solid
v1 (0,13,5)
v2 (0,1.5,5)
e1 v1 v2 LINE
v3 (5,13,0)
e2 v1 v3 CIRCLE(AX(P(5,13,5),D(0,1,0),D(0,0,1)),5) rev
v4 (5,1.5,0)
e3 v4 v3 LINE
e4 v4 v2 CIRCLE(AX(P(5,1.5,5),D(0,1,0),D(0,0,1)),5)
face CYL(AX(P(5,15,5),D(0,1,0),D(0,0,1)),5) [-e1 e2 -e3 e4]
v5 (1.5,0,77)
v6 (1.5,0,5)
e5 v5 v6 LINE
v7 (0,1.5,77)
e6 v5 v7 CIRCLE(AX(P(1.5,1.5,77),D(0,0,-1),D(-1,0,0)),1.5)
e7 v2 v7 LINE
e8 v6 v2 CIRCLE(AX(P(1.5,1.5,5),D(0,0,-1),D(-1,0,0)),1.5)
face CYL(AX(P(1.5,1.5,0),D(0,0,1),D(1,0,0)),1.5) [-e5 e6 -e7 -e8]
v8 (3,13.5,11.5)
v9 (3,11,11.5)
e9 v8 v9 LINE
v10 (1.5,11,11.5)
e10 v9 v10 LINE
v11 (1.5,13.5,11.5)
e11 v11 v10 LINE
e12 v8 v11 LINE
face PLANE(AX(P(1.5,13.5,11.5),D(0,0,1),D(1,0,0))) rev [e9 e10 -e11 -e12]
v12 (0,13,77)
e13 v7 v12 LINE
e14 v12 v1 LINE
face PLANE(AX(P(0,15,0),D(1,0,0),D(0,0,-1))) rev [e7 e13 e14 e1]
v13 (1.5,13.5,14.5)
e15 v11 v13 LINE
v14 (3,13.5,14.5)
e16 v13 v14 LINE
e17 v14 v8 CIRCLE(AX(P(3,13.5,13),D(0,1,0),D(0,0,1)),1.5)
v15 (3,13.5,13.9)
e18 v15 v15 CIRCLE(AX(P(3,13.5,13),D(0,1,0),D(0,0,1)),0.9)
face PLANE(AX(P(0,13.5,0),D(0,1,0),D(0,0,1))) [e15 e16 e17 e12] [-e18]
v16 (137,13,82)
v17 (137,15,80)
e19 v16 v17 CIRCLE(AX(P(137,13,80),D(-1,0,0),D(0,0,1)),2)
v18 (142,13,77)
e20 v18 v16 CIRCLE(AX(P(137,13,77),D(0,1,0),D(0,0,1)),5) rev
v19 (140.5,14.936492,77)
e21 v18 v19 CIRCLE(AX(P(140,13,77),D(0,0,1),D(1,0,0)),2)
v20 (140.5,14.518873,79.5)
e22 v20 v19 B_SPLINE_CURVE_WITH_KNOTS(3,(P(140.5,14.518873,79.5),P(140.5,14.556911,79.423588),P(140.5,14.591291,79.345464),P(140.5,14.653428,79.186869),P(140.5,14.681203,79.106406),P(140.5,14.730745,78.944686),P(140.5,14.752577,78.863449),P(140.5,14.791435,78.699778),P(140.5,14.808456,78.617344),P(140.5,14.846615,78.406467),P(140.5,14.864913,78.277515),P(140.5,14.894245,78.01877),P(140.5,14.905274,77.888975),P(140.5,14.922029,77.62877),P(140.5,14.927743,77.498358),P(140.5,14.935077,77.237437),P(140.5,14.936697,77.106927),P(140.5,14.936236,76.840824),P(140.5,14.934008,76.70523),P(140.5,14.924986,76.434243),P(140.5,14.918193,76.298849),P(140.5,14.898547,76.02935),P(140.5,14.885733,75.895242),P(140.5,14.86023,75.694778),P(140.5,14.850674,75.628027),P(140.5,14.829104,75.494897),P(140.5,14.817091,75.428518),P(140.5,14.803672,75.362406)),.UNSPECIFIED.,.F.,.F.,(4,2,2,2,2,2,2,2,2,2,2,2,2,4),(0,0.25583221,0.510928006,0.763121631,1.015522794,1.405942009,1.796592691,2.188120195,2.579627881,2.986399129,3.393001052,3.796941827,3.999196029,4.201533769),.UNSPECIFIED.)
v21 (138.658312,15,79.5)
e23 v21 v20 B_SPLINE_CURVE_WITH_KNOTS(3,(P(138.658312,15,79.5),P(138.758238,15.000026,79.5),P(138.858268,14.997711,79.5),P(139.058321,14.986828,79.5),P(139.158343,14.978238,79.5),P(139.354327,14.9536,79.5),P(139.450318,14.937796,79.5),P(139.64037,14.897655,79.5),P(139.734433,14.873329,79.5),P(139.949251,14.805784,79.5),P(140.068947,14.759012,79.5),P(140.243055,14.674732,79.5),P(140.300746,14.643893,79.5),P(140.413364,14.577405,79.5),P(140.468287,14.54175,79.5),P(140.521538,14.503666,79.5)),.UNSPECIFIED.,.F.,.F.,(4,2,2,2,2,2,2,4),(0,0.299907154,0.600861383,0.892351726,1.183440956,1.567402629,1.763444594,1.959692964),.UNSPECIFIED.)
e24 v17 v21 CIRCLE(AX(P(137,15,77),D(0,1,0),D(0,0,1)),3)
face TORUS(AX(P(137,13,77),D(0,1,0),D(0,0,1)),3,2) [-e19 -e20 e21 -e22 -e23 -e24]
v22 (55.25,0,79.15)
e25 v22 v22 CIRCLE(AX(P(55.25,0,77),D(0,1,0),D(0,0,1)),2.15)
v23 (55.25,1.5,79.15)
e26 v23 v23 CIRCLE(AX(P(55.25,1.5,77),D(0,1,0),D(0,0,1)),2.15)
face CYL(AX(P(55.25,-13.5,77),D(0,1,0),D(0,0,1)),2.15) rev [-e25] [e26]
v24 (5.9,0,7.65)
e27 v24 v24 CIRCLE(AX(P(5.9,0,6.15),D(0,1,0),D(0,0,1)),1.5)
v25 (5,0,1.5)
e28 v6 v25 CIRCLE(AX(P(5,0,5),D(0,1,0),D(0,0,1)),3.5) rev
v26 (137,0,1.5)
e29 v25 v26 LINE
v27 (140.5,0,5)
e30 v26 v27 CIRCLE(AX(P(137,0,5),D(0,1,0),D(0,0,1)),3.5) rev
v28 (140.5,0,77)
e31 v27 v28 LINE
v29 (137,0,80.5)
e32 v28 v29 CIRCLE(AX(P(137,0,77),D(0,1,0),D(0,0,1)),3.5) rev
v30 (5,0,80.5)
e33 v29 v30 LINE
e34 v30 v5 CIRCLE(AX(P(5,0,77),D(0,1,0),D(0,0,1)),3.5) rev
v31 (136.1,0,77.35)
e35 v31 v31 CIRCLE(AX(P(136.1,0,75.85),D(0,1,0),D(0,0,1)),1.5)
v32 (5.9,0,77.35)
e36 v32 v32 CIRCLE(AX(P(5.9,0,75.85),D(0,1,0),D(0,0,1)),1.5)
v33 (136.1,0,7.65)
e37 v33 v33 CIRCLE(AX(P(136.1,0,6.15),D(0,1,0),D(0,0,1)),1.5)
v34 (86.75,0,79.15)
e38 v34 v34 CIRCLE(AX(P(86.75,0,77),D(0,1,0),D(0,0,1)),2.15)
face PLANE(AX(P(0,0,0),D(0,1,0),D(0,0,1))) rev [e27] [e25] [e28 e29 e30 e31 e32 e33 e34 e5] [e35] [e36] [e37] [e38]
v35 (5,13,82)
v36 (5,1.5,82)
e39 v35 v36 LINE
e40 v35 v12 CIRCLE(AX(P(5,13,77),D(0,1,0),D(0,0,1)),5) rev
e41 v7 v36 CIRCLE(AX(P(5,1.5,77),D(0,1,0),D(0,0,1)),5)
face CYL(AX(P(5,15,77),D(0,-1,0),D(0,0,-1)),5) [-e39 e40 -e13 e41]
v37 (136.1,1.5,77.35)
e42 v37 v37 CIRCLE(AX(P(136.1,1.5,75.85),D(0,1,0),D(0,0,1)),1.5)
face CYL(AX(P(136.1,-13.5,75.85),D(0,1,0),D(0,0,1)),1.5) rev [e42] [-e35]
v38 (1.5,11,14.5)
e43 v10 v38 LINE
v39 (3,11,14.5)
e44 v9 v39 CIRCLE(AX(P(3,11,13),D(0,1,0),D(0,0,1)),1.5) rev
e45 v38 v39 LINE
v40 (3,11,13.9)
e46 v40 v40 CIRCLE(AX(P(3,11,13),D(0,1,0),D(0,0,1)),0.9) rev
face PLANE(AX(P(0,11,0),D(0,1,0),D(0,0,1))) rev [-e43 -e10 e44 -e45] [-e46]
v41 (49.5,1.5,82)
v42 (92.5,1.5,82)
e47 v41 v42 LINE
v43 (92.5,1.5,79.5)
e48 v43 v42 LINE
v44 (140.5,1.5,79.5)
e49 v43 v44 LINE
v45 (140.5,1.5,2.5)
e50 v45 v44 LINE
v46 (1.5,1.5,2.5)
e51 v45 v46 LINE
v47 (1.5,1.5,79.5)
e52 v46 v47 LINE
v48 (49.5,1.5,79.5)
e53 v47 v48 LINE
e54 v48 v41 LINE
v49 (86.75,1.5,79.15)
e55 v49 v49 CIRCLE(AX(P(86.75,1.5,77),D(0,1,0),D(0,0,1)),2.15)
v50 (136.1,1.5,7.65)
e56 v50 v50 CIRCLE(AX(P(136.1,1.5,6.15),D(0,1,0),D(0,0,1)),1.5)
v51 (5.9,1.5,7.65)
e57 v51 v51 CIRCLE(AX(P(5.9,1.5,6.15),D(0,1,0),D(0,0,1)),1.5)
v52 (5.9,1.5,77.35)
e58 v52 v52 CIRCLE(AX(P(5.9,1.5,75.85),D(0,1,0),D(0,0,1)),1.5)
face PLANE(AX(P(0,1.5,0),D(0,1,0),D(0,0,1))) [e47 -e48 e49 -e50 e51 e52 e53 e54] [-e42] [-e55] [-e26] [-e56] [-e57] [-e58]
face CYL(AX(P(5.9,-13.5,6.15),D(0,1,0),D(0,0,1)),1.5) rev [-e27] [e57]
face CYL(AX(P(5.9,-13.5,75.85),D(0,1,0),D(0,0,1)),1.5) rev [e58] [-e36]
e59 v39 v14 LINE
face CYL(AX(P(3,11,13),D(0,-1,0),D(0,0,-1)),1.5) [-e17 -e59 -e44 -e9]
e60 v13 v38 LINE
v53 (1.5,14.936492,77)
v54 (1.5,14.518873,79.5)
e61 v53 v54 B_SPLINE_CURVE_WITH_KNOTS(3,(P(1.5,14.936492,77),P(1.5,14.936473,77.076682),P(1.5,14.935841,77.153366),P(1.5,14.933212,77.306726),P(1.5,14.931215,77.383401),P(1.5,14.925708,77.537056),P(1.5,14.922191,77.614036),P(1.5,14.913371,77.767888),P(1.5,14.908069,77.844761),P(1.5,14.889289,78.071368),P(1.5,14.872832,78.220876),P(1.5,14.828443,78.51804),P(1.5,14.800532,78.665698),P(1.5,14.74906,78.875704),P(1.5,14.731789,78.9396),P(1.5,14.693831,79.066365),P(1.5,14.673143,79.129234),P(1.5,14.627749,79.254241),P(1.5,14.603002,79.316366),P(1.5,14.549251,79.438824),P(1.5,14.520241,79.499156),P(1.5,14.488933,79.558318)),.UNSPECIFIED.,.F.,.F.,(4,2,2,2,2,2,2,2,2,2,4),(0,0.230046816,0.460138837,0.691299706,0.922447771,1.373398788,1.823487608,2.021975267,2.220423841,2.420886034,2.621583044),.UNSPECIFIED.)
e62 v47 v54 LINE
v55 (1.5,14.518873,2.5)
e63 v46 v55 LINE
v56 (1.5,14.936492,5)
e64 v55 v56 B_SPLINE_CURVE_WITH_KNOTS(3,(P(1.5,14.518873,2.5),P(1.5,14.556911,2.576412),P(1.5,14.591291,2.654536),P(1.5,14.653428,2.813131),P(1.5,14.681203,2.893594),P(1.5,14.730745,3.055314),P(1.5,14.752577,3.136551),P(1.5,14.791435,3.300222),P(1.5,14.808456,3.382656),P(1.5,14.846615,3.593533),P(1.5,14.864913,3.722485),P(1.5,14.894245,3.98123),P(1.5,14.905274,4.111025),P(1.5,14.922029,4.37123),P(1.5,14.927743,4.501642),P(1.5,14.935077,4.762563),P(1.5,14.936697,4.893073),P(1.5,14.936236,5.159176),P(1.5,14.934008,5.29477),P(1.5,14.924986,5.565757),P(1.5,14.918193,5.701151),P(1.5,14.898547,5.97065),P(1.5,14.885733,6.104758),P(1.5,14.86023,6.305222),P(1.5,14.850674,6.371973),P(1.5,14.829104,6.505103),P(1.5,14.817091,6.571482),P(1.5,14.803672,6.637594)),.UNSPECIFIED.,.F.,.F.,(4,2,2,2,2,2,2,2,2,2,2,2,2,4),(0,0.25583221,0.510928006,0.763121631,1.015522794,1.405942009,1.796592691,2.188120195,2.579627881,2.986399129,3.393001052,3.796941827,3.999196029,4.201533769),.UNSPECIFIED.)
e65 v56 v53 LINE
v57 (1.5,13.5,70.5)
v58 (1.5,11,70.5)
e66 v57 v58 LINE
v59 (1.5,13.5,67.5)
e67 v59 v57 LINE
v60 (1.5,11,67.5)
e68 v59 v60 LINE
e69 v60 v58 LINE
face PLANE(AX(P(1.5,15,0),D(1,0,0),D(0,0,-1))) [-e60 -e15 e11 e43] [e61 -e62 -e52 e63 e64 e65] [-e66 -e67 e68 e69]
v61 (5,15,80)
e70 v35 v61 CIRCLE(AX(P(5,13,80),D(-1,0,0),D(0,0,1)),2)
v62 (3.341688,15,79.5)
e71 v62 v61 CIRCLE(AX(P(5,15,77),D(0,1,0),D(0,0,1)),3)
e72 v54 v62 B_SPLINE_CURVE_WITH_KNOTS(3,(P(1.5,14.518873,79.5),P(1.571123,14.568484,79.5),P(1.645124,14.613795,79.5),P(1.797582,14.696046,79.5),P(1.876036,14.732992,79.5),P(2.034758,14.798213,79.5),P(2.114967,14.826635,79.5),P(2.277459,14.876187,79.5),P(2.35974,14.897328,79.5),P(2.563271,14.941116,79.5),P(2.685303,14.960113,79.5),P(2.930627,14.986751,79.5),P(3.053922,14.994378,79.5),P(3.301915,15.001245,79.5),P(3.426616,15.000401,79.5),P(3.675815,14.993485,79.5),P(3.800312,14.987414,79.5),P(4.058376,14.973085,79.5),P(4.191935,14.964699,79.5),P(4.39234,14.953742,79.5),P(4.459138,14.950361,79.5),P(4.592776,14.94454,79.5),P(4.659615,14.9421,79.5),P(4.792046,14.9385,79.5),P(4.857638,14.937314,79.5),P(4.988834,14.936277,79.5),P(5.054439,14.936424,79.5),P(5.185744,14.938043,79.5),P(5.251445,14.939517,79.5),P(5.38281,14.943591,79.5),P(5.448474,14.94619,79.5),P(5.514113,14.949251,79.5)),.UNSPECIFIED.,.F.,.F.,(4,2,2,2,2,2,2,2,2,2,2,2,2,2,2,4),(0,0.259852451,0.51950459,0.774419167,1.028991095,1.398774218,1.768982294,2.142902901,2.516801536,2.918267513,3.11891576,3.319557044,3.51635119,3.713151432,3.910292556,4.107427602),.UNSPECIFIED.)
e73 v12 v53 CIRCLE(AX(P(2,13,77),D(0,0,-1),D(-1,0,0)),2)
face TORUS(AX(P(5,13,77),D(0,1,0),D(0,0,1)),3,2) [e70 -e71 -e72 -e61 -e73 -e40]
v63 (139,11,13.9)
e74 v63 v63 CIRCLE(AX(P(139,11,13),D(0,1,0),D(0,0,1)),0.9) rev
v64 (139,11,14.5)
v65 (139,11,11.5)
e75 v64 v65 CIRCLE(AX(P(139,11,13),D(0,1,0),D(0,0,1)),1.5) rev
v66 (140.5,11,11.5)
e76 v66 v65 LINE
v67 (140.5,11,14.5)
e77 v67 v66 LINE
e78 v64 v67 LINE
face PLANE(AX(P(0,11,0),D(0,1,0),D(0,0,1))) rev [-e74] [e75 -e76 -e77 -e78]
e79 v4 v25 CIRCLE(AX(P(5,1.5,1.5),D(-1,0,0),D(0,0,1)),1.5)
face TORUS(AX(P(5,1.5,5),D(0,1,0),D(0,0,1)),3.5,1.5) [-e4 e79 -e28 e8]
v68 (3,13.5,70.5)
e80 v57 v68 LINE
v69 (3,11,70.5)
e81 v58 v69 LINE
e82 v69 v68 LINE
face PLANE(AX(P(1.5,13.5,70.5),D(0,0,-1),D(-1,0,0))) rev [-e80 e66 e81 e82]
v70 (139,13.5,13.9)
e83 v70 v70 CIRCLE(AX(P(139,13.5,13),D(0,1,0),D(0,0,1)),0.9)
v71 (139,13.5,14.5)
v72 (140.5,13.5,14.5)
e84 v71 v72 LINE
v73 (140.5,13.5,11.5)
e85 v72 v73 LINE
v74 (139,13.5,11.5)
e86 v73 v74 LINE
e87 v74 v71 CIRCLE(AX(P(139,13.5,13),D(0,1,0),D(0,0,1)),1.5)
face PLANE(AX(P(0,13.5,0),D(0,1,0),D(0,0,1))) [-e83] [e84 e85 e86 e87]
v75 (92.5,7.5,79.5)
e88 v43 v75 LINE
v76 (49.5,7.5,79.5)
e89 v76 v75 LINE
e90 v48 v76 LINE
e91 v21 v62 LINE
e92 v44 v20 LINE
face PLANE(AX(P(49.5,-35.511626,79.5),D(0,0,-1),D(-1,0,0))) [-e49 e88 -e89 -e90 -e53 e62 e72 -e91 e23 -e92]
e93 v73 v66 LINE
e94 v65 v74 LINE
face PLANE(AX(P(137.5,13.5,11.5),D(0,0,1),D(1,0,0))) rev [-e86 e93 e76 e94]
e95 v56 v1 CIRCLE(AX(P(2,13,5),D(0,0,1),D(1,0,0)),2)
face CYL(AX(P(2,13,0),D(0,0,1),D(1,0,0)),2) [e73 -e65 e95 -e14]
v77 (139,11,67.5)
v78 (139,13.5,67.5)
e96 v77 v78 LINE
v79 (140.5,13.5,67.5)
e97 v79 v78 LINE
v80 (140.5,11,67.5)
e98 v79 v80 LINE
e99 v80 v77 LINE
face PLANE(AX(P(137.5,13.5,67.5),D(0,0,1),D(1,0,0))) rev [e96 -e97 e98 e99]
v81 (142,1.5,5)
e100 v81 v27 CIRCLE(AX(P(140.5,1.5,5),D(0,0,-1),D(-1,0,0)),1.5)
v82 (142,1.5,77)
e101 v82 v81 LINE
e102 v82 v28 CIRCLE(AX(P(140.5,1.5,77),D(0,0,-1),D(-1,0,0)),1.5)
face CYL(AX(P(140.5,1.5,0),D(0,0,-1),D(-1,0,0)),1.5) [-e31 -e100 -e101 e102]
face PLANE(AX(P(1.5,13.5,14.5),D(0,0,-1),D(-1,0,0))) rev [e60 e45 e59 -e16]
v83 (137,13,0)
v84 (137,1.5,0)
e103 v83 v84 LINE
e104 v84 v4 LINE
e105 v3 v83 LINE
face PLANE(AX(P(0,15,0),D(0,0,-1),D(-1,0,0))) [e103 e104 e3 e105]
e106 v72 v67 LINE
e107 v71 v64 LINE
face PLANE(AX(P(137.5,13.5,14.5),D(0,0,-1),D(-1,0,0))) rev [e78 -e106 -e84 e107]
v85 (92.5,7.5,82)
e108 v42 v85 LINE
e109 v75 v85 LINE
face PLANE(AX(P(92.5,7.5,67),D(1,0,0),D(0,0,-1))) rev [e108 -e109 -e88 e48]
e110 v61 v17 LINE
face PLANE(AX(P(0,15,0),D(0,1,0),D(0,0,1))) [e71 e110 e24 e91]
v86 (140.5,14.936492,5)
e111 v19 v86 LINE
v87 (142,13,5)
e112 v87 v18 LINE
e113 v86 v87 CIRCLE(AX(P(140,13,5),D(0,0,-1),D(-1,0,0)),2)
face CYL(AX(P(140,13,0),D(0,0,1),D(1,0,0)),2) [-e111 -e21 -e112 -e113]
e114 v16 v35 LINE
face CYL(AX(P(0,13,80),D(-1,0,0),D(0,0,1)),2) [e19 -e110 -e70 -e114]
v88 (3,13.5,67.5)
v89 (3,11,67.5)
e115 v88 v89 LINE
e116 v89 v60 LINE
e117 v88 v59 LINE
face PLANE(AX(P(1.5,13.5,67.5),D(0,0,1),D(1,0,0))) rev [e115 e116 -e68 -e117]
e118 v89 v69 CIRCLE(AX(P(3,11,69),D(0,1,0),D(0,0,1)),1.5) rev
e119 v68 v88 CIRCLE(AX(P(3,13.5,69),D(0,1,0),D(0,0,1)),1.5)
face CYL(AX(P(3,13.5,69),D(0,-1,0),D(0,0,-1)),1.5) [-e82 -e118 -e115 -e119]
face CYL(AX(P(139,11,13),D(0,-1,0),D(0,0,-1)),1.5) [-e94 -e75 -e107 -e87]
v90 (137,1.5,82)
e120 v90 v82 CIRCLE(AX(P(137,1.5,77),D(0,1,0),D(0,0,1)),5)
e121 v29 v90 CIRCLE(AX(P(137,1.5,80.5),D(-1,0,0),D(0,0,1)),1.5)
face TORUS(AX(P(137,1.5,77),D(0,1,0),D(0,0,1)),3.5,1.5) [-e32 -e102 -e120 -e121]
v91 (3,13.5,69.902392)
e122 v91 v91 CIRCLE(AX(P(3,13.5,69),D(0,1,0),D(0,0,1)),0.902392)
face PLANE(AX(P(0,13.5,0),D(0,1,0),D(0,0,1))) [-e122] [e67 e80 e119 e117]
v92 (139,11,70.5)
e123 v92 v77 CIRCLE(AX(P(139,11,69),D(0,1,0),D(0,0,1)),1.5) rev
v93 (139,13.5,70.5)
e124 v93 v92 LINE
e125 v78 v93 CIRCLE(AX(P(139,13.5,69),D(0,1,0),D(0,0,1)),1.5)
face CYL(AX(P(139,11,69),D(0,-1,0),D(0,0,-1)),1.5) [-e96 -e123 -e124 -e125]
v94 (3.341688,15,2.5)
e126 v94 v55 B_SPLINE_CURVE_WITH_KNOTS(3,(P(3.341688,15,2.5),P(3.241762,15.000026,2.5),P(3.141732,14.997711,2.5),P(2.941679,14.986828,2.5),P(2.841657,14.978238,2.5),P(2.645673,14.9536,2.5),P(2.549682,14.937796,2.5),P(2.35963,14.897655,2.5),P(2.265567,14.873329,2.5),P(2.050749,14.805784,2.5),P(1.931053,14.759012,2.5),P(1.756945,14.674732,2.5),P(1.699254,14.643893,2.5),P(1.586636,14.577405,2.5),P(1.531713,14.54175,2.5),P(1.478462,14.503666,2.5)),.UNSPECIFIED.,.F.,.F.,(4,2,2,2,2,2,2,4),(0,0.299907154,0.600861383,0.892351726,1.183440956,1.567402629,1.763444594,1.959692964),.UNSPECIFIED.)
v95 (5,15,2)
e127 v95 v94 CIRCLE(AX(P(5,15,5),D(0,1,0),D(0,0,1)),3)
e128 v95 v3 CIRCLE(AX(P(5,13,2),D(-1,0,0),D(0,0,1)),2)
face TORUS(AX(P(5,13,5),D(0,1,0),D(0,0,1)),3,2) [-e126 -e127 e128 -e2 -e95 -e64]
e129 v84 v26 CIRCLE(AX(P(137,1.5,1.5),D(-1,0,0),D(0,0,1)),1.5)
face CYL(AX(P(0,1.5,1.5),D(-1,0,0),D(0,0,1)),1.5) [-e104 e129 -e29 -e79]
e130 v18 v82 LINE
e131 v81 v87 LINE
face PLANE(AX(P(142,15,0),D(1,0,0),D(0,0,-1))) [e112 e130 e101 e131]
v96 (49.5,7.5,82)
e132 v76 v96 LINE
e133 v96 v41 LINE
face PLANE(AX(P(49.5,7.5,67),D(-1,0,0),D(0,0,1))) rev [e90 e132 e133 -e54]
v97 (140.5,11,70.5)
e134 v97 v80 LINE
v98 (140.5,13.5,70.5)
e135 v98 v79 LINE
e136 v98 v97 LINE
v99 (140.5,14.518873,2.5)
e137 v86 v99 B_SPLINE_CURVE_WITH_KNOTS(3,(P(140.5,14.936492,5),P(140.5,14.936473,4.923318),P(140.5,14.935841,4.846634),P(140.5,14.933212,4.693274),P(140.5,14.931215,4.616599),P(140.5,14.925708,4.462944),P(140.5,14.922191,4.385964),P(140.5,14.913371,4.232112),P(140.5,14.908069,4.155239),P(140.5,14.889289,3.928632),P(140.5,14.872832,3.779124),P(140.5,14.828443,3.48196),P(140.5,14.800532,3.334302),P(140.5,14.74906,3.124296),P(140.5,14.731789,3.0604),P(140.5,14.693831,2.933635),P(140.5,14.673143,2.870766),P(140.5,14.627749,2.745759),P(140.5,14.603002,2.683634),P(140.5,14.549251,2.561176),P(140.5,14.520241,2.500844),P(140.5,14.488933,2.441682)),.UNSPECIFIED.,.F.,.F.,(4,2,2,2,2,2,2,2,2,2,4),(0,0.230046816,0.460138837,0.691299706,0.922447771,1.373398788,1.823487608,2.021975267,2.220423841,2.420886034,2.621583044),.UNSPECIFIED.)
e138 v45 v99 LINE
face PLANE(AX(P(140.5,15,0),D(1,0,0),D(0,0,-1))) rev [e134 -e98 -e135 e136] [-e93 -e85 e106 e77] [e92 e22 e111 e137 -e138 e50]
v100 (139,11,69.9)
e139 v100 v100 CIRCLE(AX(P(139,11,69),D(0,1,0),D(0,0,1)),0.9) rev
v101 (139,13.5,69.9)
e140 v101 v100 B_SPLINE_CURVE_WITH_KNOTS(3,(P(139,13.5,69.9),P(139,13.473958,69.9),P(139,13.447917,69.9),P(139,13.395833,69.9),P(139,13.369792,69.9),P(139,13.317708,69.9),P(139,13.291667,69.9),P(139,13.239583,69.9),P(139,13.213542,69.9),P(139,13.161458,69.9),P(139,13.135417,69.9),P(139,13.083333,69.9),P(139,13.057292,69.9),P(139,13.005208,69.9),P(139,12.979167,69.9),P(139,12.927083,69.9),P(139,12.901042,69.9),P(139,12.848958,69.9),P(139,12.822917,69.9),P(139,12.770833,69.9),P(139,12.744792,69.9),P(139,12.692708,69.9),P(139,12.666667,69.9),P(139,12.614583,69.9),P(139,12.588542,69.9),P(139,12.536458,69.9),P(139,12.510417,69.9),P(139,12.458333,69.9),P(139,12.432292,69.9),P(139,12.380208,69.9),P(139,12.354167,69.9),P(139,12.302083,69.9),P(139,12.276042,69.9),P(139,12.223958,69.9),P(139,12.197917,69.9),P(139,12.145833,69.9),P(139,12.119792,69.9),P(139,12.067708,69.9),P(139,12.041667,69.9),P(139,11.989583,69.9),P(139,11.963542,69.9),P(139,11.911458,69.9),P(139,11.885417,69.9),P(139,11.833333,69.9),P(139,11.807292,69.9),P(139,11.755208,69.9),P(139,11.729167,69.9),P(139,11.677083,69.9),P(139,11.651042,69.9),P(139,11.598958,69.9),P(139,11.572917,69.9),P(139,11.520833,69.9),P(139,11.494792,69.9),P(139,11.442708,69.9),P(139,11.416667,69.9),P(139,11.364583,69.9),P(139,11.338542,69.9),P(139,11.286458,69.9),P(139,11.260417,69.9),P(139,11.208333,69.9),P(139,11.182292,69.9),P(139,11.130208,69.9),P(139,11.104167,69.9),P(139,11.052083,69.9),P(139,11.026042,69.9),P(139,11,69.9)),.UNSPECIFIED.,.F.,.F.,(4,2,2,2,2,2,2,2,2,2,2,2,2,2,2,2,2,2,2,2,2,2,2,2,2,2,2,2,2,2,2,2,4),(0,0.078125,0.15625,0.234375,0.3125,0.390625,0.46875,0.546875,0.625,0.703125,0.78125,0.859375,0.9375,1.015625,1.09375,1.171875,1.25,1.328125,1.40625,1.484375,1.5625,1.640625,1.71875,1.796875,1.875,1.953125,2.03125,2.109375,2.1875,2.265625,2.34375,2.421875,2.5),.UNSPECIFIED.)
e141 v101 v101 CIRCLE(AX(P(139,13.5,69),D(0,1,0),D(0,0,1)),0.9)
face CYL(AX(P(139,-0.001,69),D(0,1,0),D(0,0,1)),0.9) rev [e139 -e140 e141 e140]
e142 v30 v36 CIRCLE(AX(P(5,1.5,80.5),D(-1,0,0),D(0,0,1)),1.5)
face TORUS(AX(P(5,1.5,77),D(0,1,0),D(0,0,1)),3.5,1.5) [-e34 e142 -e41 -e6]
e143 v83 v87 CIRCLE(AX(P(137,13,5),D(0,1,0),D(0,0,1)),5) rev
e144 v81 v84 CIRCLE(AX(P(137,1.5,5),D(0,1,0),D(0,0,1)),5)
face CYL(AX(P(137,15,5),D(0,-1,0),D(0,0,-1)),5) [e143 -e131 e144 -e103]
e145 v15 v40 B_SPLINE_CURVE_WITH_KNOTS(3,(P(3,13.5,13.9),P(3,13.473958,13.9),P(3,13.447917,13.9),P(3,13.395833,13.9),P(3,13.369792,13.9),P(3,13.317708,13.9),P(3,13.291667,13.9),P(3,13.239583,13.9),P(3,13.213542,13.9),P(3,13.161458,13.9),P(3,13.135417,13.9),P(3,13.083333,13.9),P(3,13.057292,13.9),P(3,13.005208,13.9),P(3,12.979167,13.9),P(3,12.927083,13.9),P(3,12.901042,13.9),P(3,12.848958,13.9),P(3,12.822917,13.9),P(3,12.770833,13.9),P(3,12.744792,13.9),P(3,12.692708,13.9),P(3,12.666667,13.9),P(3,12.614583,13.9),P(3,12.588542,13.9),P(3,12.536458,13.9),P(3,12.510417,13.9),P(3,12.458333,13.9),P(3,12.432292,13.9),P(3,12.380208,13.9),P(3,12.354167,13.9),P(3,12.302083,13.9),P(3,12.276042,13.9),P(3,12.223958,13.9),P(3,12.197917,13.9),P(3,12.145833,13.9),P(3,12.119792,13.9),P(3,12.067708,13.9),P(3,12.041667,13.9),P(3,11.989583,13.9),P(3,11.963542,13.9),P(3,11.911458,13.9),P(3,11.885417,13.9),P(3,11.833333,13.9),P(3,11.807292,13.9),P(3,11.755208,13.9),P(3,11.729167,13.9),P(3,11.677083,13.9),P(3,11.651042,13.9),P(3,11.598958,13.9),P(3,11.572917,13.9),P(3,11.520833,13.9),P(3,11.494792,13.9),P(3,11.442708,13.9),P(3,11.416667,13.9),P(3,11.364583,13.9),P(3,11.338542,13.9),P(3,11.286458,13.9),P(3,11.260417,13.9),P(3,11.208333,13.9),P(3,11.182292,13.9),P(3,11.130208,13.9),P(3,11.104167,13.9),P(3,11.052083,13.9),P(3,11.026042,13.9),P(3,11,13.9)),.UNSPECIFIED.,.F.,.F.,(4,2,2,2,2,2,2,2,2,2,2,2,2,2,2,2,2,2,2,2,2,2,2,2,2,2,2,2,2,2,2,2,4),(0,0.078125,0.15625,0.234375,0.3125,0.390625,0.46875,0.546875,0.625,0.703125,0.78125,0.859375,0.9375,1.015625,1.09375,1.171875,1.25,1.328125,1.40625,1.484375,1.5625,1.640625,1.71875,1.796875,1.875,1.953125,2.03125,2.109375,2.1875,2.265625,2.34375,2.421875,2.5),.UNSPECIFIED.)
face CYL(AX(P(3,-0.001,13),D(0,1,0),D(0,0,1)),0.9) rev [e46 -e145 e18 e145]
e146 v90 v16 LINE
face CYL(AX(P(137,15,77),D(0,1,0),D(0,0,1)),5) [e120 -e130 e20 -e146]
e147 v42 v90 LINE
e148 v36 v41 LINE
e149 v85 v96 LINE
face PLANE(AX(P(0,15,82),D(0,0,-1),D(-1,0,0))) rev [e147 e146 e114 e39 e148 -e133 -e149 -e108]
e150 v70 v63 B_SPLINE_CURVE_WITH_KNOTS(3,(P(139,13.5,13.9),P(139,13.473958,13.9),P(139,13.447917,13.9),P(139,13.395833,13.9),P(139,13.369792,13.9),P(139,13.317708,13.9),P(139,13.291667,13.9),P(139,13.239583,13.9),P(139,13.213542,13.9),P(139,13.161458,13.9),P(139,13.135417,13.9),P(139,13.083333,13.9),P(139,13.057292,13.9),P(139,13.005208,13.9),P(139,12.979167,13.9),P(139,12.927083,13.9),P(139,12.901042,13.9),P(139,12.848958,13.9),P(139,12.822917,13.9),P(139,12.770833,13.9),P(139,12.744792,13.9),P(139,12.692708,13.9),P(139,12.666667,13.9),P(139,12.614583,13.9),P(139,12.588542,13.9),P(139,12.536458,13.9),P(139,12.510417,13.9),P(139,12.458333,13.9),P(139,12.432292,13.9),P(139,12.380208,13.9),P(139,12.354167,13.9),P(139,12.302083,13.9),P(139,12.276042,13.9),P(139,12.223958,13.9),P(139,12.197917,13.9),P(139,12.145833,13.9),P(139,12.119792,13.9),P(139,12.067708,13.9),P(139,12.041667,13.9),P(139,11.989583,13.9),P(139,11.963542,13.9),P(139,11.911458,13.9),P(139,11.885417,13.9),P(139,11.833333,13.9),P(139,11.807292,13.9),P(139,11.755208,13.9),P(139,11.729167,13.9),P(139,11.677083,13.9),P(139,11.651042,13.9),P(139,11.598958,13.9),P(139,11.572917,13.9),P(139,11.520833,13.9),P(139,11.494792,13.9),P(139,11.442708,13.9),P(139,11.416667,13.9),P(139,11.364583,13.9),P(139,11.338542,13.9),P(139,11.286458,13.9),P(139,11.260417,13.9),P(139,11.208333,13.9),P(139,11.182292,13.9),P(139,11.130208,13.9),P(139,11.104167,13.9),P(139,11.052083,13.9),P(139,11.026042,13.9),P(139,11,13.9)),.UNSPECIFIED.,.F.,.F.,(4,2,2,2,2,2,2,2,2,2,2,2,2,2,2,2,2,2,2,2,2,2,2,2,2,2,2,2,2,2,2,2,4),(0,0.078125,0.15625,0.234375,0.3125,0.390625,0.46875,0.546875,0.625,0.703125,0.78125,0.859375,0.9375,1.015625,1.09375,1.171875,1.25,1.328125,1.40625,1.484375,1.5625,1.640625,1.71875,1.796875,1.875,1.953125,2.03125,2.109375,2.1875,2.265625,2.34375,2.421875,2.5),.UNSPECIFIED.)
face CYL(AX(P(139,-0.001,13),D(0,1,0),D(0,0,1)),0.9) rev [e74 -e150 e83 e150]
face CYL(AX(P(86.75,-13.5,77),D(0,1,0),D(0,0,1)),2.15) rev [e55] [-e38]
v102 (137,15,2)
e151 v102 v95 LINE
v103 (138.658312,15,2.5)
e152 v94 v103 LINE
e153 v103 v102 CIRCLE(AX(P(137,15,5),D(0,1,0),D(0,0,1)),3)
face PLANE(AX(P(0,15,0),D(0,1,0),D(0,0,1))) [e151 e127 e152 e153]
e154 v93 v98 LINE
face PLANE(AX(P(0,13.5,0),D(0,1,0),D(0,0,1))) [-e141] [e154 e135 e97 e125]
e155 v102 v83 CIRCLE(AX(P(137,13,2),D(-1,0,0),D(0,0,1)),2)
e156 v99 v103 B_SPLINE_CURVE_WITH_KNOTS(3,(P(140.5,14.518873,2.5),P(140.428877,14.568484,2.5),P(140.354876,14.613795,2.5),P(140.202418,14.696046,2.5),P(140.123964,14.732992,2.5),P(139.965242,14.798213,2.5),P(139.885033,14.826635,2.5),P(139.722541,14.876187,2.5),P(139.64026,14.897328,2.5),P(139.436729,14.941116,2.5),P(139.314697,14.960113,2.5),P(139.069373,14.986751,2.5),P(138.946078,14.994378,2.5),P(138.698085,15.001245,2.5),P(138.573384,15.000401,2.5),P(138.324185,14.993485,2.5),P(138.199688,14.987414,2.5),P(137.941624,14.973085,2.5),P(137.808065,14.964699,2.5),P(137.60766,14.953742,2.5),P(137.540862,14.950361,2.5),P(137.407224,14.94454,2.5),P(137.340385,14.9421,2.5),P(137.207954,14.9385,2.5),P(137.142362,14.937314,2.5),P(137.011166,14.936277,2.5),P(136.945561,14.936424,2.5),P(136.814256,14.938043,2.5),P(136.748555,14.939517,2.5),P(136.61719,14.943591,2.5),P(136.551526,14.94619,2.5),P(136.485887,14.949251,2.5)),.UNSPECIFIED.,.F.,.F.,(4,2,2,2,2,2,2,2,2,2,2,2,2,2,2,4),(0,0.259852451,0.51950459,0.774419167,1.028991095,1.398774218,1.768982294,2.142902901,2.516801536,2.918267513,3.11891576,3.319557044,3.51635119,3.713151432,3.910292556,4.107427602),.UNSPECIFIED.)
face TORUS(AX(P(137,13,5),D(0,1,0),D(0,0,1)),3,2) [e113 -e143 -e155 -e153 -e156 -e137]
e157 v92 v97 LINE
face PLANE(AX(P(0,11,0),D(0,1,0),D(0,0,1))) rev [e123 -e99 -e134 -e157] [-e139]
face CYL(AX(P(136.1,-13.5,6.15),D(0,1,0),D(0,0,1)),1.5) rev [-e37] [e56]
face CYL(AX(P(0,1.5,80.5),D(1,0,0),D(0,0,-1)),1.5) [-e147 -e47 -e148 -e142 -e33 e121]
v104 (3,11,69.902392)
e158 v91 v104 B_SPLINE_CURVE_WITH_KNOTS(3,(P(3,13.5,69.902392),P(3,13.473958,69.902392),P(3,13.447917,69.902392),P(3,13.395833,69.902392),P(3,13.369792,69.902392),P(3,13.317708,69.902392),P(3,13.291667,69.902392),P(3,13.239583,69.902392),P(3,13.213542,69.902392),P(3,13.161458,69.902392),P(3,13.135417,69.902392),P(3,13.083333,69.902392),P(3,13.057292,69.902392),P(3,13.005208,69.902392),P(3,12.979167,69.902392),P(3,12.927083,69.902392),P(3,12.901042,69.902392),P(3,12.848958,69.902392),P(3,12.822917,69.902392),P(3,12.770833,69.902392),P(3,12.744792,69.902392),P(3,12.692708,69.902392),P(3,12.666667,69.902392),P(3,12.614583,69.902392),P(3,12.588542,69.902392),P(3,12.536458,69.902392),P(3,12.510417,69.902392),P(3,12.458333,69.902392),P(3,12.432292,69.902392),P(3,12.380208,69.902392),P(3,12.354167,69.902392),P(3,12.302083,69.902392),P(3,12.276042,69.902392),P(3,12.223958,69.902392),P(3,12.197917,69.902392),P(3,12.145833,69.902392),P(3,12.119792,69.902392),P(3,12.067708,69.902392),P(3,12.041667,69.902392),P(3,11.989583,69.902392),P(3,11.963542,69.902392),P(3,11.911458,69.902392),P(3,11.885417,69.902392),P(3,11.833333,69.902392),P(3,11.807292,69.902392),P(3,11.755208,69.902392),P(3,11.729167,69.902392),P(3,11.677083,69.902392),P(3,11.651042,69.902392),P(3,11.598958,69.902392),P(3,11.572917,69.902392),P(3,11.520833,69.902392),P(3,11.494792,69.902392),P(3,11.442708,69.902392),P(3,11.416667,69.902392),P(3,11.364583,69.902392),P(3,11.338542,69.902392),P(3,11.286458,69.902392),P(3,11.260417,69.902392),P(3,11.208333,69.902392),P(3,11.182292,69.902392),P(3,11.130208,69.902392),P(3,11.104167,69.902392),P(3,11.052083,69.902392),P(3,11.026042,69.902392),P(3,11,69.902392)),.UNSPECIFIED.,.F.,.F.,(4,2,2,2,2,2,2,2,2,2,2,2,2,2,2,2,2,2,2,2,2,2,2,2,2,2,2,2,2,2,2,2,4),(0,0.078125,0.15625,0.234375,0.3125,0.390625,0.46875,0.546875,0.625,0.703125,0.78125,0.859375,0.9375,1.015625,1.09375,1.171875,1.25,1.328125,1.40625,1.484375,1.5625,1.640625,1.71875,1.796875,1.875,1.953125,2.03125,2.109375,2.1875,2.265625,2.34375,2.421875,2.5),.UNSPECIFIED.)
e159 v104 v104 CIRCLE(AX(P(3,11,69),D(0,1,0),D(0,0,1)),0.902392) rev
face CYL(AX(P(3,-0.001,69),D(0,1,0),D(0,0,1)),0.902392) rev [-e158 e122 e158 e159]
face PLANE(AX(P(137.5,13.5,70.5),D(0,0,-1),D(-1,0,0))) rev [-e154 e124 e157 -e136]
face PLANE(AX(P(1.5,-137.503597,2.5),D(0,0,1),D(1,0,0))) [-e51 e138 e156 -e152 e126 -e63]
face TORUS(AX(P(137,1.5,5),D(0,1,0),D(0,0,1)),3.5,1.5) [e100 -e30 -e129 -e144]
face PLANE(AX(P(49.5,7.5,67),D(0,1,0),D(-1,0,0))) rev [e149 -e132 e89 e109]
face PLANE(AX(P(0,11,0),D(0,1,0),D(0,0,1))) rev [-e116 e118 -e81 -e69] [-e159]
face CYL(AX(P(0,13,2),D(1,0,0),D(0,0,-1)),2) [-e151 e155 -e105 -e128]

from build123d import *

# Parameters (mm, degrees)
SKETCH_1_W          = 142
SKETCH_1_H          = 82
EXTRUDE_1_DEPTH     = 15
SHELL_1_T           = -1.5
SKETCH_2_R          = 2.15
CUT_EXTRUDE_1_DEPTH = 15
SKETCH_4_R          = 1.5
CUT_EXTRUDE_2_DEPTH = 15
SKETCH_5_W          = 43
SKETCH_5_H          = 6
CUT_EXTRUDE_3_DEPTH = 15
SKETCH_6_W          = 3
SKETCH_6_H          = 3
EXTRUDE_2_DEPTH     = 2.5
CUT_EXTRUDE_4_REACH = 166.53
SKETCH_7_R          = 0.9
SKETCH_7_R_2        = 0.902391506
FILLET_4_RADIUS     = 1.5
FILLET_4_LENGTH     = 2.5
FILLET_5_RADIUS     = 1.5
FILLET_5_LENGTH     = 2.5
FILLET_6_RADIUS     = 1.5
FILLET_6_LENGTH     = 2.5
FILLET_7_RADIUS     = 1.5
FILLET_7_LENGTH     = 2.5
FILLET_8_R          = 5
FILLET_13_R         = 1.5
SKETCH_8_W          = 139
SKETCH_8_H          = 1
EXTRUDE_7_DEPTH     = 13.5
SKETCH_9_W          = 43
SKETCH_9_H          = 1
EXTRUDE_8_DEPTH     = 7.5
SKETCH_10_W         = 48
SKETCH_10_H         = 1
EXTRUDE_9_DEPTH     = 13.5
FILLET_14_R         = 2


# Some blends are built 0.0001 mm under size
with BuildPart() as part:
    # 草图1 → 凸台-拉伸1 (new body)
    with BuildSketch(Plane(origin=(0, 0, 0), x_dir=(1, 0, 0), z_dir=(0, 1, 0))):
        with Locations((71, -41)):
            Rectangle(SKETCH_1_W, SKETCH_1_H)
    extrude(amount=EXTRUDE_1_DEPTH)

    # 抽壳1
    shell_1_openings = [part.faces().sort_by_distance(p)[0] for p in [
        (71, 15, 41),
    ]]
    offset(amount=SHELL_1_T, openings=shell_1_openings, kind=Kind.INTERSECTION)

    # 草图2 → 切除-拉伸1 (cut)
    with BuildSketch(Plane(origin=(0, 1.5, 0), x_dir=(1, 0, 0), z_dir=(0, 1, 0))):
        with Locations(Location((86.75, -77, 0), (0, 0, 270))):
            Circle(SKETCH_2_R)
        with Locations(Location((55.25, -77, 0), (0, 0, 270))):
            Circle(SKETCH_2_R)
    extrude(amount=-CUT_EXTRUDE_1_DEPTH, mode=Mode.SUBTRACT)

    # 草图4 → 切除-拉伸2 (cut)
    with BuildSketch(Plane(origin=(0, 1.5, 0), x_dir=(1, 0, 0), z_dir=(0, 1, 0))):
        with Locations(Location((5.9, -75.85, 0), (0, 0, 270))):
            Circle(SKETCH_4_R)
        with Locations(Location((136.1, -75.85, 0), (0, 0, 270))):
            Circle(SKETCH_4_R)
        with Locations(Location((5.9, -6.15, 0), (0, 0, 270))):
            Circle(SKETCH_4_R)
        with Locations(Location((136.1, -6.15, 0), (0, 0, 270))):
            Circle(SKETCH_4_R)
    extrude(amount=-CUT_EXTRUDE_2_DEPTH, mode=Mode.SUBTRACT)

    # 草图5 → 切除-拉伸3 (cut)
    with BuildSketch(Plane.XY.offset(82)):
        with Locations((71, 4.5)):
            Rectangle(SKETCH_5_W, SKETCH_5_H)
    extrude(amount=-CUT_EXTRUDE_3_DEPTH, mode=Mode.SUBTRACT)

    # 草图6 → 凸台-拉伸2 (add)
    with BuildSketch(Plane(origin=(0, 11, 0), x_dir=(1, 0, 0), z_dir=(0, 1, 0))):
        with Locations((3, -69)):
            Rectangle(SKETCH_6_W, SKETCH_6_H)
        with Locations((3, -13)):
            Rectangle(SKETCH_6_W, SKETCH_6_H)
        with Locations((139, -13)):
            Rectangle(SKETCH_6_W, SKETCH_6_H)
        with Locations((139, -69)):
            Rectangle(SKETCH_6_W, SKETCH_6_H)
    extrude(amount=EXTRUDE_2_DEPTH)

    # 草图7 → 切除-拉伸4 (cut, up to next)
    with BuildSketch(Plane(origin=(0, 13.5, 0), x_dir=(1, 0, 0), z_dir=(0, 1, 0)), mode=Mode.PRIVATE) as cut_extrude_4_sk1:
        with Locations(Location((3, -13, 0), (0, 0, 270))):
            Circle(SKETCH_7_R)
    cut_extrude_4_tool1 = extrude(cut_extrude_4_sk1.sketch, amount=-CUT_EXTRUDE_4_REACH, mode=Mode.PRIVATE) & part.part
    # 草图7 → 切除-拉伸4 (cut, up to next)
    with BuildSketch(Plane(origin=(0, 13.5, 0), x_dir=(1, 0, 0), z_dir=(0, 1, 0)), mode=Mode.PRIVATE) as cut_extrude_4_sk2:
        with Locations(Location((3, -69, 0), (0, 0, 270))):
            Circle(SKETCH_7_R_2)
    cut_extrude_4_tool2 = extrude(cut_extrude_4_sk2.sketch, amount=-CUT_EXTRUDE_4_REACH, mode=Mode.PRIVATE) & part.part
    # 草图7 → 切除-拉伸4 (cut, up to next)
    with BuildSketch(Plane(origin=(0, 13.5, 0), x_dir=(1, 0, 0), z_dir=(0, 1, 0)), mode=Mode.PRIVATE) as cut_extrude_4_sk3:
        with Locations(Location((139, -69, 0), (0, 0, 270))):
            Circle(SKETCH_7_R)
    cut_extrude_4_tool3 = extrude(cut_extrude_4_sk3.sketch, amount=-CUT_EXTRUDE_4_REACH, mode=Mode.PRIVATE) & part.part
    # 草图7 → 切除-拉伸4 (cut, up to next)
    with BuildSketch(Plane(origin=(0, 13.5, 0), x_dir=(1, 0, 0), z_dir=(0, 1, 0)), mode=Mode.PRIVATE) as cut_extrude_4_sk4:
        with Locations(Location((139, -13, 0), (0, 0, 270))):
            Circle(SKETCH_7_R)
    cut_extrude_4_tool4 = extrude(cut_extrude_4_sk4.sketch, amount=-CUT_EXTRUDE_4_REACH, mode=Mode.PRIVATE) & part.part
    add(cut_extrude_4_tool1.solids().sort_by_distance((3, 13.5, 13))[0], mode=Mode.SUBTRACT)
    add(cut_extrude_4_tool2.solids().sort_by_distance((3, 13.5, 69))[0], mode=Mode.SUBTRACT)
    add(cut_extrude_4_tool3.solids().sort_by_distance((139, 13.5, 69))[0], mode=Mode.SUBTRACT)
    add(cut_extrude_4_tool4.solids().sort_by_distance((139, 13.5, 13))[0], mode=Mode.SUBTRACT)

    # 圆角4: full round fillet: the end face becomes a half cylinder, R = half its width
    fillet_4_face = Plane((4.5, 12.25, 13), x_dir=(0, -1, 0), z_dir=(1, 0, 0))  # on the end face: x along it, z out of the body
    fillet_4_slab = fillet_4_face.offset(-FILLET_4_RADIUS / 2) * Box(FILLET_4_LENGTH, 2 * FILLET_4_RADIUS, FILLET_4_RADIUS, mode=Mode.PRIVATE)  # the body's end, R deep
    fillet_4_round = Plane((3, 12.25, 13), x_dir=(1, 0, 0), z_dir=(0, -1, 0)) * Cylinder(FILLET_4_RADIUS, FILLET_4_LENGTH, mode=Mode.PRIVATE)  # its axis R under the face
    add(fillet_4_slab - fillet_4_round, mode=Mode.SUBTRACT)

    # 圆角5: full round fillet: the end face becomes a half cylinder, R = half its width
    fillet_5_face = Plane((4.5, 12.25, 69), x_dir=(0, -1, 0), z_dir=(1, 0, 0))  # on the end face: x along it, z out of the body
    fillet_5_slab = fillet_5_face.offset(-FILLET_5_RADIUS / 2) * Box(FILLET_5_LENGTH, 2 * FILLET_5_RADIUS, FILLET_5_RADIUS, mode=Mode.PRIVATE)  # the body's end, R deep
    fillet_5_round = Plane((3, 12.25, 69), x_dir=(1, 0, 0), z_dir=(0, -1, 0)) * Cylinder(FILLET_5_RADIUS, FILLET_5_LENGTH, mode=Mode.PRIVATE)  # its axis R under the face
    add(fillet_5_slab - fillet_5_round, mode=Mode.SUBTRACT)

    # 圆角6: full round fillet: the end face becomes a half cylinder, R = half its width
    fillet_6_face = Plane((137.5, 12.25, 13), x_dir=(0, -1, 0), z_dir=(-1, 0, 0))  # on the end face: x along it, z out of the body
    fillet_6_slab = fillet_6_face.offset(-FILLET_6_RADIUS / 2) * Box(FILLET_6_LENGTH, 2 * FILLET_6_RADIUS, FILLET_6_RADIUS, mode=Mode.PRIVATE)  # the body's end, R deep
    fillet_6_round = Plane((139, 12.25, 13), x_dir=(-1, 0, 0), z_dir=(0, -1, 0)) * Cylinder(FILLET_6_RADIUS, FILLET_6_LENGTH, mode=Mode.PRIVATE)  # its axis R under the face
    add(fillet_6_slab - fillet_6_round, mode=Mode.SUBTRACT)

    # 圆角7: full round fillet: the end face becomes a half cylinder, R = half its width
    fillet_7_face = Plane((137.5, 12.25, 69), x_dir=(0, -1, 0), z_dir=(-1, 0, 0))  # on the end face: x along it, z out of the body
    fillet_7_slab = fillet_7_face.offset(-FILLET_7_RADIUS / 2) * Box(FILLET_7_LENGTH, 2 * FILLET_7_RADIUS, FILLET_7_RADIUS, mode=Mode.PRIVATE)  # the body's end, R deep
    fillet_7_round = Plane((139, 12.25, 69), x_dir=(-1, 0, 0), z_dir=(0, -1, 0)) * Cylinder(FILLET_7_RADIUS, FILLET_7_LENGTH, mode=Mode.PRIVATE)  # its axis R under the face
    add(fillet_7_slab - fillet_7_round, mode=Mode.SUBTRACT)

    # 圆角8
    fillet_8_edges = [part.edges().sort_by_distance(p)[0] for p in [
        (0, 7.5, 0),
        (142, 7.5, 0),
        (142, 7.5, 82),
        (0, 7.5, 82),
    ]]
    fillet(fillet_8_edges, radius=FILLET_8_R)

    # 圆角13
    fillet_13_edges = [part.edges().sort_by_distance(p)[0] for p in [
        (71, 0, 82),
        (0, 0, 41),
        (71, 0, 0),
        (142, 0, 41),
        (140.535533906, 0, 80.535533906),
        (140.535533906, 0, 1.464466094),
        (1.464466094, 0, 1.464466094),
        (1.464466094, 0, 80.535533906),
    ]]
    fillet(fillet_13_edges, radius=FILLET_13_R - 0.0001)  # a hair under: the kernel refuses the full size

    # 草图8 → 凸台-拉伸7 (add)
    with BuildSketch(Plane(origin=(0, 15, 0), x_dir=(1, 0, 0), z_dir=(0, 1, 0))):
        with Locations((71, -2)):
            Rectangle(SKETCH_8_W, SKETCH_8_H)
    extrude(amount=-EXTRUDE_7_DEPTH)

    # 草图9 → 凸台-拉伸8 (add)
    with BuildSketch(Plane(origin=(0, 15, 0), x_dir=(1, 0, 0), z_dir=(0, 1, 0))):
        with Locations((71, -80)):
            Rectangle(SKETCH_9_W, SKETCH_9_H)
    extrude(amount=-EXTRUDE_8_DEPTH)

    # 草图10 → 凸台-拉伸9 (add)
    with BuildSketch(Plane(origin=(0, 15, 0), x_dir=(1, 0, 0), z_dir=(0, 1, 0))):
        with Locations((25.5, -80)):
            Rectangle(SKETCH_10_W, SKETCH_10_H)
        with Locations((116.5, -80)):
            Rectangle(SKETCH_10_W, SKETCH_10_H)
    extrude(amount=-EXTRUDE_9_DEPTH)

    # 圆角14
    # the kernel refuses this fillet: 2 mm, written as the material it takes off along each edge
    with BuildSketch(Plane(origin=(5, 15, 77), x_dir=(0, 0, 1), z_dir=(1, 0, 0))) as fillet_14_piece_1:
        with BuildLine():
            CenterArc((5 - FILLET_14_R, FILLET_14_R), FILLET_14_R, 270, 90)
            Line((5 - FILLET_14_R, 0), (5, 0))
            Line((5, 0), (5, FILLET_14_R))
        make_face()
    revolve(axis=Axis((5, 15, 77), (0, -1, 0)), revolution_arc=90, mode=Mode.SUBTRACT)
    with BuildSketch(Plane(origin=(5, 15, 5), x_dir=(0, 0, -1), z_dir=(1, 0, 0))) as fillet_14_piece_2:
        with BuildLine():
            CenterArc((5 - FILLET_14_R, -FILLET_14_R), FILLET_14_R, 0, 90)
            Line((5, -FILLET_14_R), (5, 0))
            Line((5, 0), (5 - FILLET_14_R, 0))
        make_face()
    revolve(axis=Axis((5, 15, 5), (0, 1, 0)), revolution_arc=90, mode=Mode.SUBTRACT)
    with BuildSketch(Plane(origin=(5, 15, 0), x_dir=(0, -1, 0), z_dir=(1, 0, 0)), Plane(origin=(137, 15, 82), x_dir=(0, -1, 0), z_dir=(-1, 0, 0))) as fillet_14_piece_3:
        with BuildLine():
            CenterArc((FILLET_14_R, -FILLET_14_R), FILLET_14_R, 90, 90)
            Line((0, -FILLET_14_R), (0, 0))
            Line((0, 0), (FILLET_14_R, 0))
        make_face()
    extrude(amount=132, mode=Mode.SUBTRACT)
    with BuildSketch(Plane(origin=(137, 15, 5), x_dir=(0, 0, -1), z_dir=(-1, 0, 0))) as fillet_14_piece_4:
        with BuildLine():
            CenterArc((5 - FILLET_14_R, FILLET_14_R), FILLET_14_R, 270, 90)
            Line((5 - FILLET_14_R, 0), (5, 0))
            Line((5, 0), (5, FILLET_14_R))
        make_face()
    revolve(axis=Axis((137, 15, 5), (0, -1, 0)), revolution_arc=90, mode=Mode.SUBTRACT)
    with BuildSketch(Plane(origin=(137, 15, 77), x_dir=(0, 0, 1), z_dir=(-1, 0, 0))) as fillet_14_piece_5:
        with BuildLine():
            CenterArc((5 - FILLET_14_R, -FILLET_14_R), FILLET_14_R, 0, 90)
            Line((5 - FILLET_14_R, 0), (5, 0))
            Line((5, 0), (5, -FILLET_14_R))
        make_face()
    revolve(axis=Axis((137, 15, 77), (0, 1, 0)), revolution_arc=90, mode=Mode.SUBTRACT)
    with BuildSketch(Plane(origin=(142, 15, 5), x_dir=(0, -1, 0), z_dir=(0, 0, 1)), Plane(origin=(0, 15, 77), x_dir=(0, -1, 0), z_dir=(0, 0, -1))) as fillet_14_piece_6:
        with BuildLine():
            CenterArc((FILLET_14_R, -FILLET_14_R), FILLET_14_R, 90, 90)
            Line((0, -FILLET_14_R), (0, 0))
            Line((0, 0), (FILLET_14_R, 0))
        make_face()
    extrude(amount=72, mode=Mode.SUBTRACT)


solid = part.part
